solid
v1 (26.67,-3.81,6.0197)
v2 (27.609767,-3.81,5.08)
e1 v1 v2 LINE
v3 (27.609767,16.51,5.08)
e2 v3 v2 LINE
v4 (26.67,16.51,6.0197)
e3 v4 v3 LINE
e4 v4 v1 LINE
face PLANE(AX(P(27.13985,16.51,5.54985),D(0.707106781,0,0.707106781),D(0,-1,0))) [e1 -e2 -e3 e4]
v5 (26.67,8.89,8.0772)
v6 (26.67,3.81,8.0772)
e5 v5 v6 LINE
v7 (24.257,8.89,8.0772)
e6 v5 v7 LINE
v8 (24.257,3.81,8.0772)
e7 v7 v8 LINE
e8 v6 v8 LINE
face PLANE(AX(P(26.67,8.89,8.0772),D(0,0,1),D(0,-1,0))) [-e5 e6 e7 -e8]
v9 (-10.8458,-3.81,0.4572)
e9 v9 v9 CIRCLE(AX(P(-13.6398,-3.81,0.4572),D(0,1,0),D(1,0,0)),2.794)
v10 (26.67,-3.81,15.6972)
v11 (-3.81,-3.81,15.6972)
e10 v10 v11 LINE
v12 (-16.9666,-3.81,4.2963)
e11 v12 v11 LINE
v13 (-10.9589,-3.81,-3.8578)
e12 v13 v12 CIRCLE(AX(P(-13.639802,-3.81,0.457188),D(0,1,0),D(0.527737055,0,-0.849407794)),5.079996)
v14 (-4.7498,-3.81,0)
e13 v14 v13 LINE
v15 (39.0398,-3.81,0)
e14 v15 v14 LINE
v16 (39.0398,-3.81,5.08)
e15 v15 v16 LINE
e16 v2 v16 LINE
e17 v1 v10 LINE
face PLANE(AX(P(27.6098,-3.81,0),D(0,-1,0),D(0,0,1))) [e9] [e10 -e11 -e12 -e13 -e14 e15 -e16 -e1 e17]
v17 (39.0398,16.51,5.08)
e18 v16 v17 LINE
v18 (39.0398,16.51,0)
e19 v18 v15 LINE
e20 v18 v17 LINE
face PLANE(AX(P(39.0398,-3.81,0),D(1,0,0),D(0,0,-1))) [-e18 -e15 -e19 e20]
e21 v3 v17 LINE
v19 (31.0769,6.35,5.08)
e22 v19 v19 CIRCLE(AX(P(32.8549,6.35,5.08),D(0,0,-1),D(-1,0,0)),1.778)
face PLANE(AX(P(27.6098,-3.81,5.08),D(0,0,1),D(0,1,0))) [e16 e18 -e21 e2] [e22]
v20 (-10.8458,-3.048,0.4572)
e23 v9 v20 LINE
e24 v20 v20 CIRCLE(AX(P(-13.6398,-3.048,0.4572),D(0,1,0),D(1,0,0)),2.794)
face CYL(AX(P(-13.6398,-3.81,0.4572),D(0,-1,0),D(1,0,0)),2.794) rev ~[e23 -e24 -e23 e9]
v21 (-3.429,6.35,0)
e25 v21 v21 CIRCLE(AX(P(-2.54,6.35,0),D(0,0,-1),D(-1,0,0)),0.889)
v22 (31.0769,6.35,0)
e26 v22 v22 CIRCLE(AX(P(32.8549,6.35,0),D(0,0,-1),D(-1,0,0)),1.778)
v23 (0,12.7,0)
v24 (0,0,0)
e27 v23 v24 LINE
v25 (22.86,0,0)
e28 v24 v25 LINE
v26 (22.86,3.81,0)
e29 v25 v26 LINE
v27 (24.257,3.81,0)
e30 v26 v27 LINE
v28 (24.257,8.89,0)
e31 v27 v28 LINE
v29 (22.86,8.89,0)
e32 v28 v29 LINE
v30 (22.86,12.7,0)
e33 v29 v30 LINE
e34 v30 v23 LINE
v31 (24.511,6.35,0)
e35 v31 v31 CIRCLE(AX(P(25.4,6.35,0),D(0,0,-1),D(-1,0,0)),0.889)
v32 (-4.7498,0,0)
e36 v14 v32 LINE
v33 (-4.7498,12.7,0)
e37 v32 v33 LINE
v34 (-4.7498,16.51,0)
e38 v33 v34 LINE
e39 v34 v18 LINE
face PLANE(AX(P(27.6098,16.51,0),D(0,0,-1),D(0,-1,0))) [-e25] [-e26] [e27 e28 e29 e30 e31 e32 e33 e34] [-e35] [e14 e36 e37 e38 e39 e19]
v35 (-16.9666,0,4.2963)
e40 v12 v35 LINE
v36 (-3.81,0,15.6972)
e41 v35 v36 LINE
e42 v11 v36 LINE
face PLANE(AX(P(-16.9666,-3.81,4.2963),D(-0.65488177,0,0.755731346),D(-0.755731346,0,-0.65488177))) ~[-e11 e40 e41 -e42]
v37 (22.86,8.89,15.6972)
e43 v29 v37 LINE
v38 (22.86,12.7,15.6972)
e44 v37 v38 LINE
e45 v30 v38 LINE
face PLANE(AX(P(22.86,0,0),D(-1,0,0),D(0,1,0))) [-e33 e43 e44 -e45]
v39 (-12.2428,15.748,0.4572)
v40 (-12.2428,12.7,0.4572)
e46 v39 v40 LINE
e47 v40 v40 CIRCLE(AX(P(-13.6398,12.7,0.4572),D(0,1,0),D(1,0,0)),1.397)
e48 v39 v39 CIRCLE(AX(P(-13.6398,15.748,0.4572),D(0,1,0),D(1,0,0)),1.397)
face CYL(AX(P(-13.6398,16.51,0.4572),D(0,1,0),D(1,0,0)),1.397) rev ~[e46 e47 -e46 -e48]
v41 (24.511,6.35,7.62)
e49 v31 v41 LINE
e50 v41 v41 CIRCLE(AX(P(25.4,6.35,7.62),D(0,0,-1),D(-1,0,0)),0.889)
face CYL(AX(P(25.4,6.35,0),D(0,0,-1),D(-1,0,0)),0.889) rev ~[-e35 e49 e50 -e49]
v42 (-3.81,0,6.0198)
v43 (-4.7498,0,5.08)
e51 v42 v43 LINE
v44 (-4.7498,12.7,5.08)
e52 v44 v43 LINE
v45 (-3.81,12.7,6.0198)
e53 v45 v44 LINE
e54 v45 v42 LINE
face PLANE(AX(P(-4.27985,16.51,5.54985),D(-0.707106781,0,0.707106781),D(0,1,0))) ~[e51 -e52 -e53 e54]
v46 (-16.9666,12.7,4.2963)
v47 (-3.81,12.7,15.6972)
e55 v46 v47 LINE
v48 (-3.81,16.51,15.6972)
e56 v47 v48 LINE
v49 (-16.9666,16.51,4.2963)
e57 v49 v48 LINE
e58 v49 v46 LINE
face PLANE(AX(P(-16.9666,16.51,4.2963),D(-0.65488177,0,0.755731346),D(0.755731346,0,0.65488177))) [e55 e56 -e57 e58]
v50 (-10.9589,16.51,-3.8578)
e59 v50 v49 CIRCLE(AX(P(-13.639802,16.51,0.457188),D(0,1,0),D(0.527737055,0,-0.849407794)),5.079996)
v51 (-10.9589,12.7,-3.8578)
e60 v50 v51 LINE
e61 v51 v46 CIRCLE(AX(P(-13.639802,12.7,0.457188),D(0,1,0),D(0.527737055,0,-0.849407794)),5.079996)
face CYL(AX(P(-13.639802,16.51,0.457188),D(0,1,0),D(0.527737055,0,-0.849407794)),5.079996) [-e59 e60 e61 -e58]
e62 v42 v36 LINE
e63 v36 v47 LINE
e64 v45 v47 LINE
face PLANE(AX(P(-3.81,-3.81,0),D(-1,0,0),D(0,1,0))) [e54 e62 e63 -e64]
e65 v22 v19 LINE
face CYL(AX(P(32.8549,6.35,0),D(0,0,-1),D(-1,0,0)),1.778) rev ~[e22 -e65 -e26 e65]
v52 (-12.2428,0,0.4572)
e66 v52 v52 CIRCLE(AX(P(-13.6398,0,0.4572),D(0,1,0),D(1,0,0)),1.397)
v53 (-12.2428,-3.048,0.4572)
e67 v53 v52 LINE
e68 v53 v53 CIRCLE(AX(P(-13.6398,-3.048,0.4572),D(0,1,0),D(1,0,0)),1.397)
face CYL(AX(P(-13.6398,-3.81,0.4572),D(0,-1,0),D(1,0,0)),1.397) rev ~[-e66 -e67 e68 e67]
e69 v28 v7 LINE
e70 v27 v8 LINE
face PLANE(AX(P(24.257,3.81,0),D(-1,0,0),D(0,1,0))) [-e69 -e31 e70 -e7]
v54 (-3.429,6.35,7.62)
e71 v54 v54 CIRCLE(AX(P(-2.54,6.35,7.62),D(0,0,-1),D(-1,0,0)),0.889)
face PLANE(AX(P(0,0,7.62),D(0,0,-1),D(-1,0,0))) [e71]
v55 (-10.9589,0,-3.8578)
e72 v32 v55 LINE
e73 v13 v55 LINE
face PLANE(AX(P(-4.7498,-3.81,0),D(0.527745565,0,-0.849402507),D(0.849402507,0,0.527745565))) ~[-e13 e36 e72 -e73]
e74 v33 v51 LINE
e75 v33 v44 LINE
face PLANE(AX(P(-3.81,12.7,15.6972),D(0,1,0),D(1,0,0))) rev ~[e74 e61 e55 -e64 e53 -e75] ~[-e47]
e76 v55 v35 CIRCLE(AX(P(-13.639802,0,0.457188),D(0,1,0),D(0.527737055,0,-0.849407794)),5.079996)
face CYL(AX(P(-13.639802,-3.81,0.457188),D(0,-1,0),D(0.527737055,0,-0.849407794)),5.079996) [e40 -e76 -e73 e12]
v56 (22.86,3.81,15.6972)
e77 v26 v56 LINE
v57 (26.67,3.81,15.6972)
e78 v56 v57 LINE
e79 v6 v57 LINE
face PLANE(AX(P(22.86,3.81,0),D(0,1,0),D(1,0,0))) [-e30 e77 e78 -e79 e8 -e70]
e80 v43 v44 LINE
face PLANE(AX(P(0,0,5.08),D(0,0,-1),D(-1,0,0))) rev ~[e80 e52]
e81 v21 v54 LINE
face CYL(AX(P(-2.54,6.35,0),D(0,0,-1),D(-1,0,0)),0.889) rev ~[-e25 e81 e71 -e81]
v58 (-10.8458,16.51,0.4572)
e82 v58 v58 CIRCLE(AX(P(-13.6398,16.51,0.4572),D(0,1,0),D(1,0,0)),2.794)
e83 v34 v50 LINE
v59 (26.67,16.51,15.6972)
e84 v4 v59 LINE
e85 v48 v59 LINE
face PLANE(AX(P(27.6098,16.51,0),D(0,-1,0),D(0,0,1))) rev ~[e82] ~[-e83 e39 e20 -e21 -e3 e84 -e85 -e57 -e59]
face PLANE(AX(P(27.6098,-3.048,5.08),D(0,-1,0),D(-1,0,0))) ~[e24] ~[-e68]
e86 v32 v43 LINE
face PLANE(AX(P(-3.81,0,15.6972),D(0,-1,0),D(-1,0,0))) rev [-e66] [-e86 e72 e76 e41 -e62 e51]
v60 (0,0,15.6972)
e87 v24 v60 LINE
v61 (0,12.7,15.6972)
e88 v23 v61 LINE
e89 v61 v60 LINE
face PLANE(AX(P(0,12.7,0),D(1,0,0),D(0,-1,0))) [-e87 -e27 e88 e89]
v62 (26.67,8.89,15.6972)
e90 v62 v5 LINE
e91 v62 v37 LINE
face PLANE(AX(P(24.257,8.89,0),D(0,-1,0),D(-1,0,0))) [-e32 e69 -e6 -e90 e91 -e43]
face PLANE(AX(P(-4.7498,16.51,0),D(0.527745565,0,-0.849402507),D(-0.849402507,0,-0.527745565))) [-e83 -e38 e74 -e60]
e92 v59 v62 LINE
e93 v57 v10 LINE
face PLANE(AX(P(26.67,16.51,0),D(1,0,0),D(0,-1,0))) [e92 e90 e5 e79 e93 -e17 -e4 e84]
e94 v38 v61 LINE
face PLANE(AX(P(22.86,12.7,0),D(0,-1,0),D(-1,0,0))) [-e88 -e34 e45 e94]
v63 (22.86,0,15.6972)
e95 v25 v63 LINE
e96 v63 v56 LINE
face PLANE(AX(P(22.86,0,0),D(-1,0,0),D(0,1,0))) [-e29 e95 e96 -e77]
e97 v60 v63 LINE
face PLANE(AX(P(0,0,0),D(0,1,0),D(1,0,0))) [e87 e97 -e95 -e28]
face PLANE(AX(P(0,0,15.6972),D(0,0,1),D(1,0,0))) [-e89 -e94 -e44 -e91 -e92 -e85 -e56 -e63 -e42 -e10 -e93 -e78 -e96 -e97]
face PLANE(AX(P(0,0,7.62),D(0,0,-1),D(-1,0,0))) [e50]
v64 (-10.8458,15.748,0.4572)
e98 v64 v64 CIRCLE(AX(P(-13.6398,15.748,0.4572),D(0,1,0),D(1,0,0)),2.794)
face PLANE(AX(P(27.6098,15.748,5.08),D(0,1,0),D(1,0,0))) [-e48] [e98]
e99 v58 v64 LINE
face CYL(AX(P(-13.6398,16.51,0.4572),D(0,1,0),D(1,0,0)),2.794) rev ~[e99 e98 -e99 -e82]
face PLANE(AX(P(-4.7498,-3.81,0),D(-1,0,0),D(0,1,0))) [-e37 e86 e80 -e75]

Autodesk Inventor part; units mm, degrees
ref_plane "YZ Plane" through (0, 0, 0) normal (1, 0, 0) x (0, 1, 0)
sketch "Sketch1" plane through (0, 0, 0) normal (0, 0, 1) x (1, 0, 0)
  line L0 (0, 0) -> (22.86, 0)
  line L1 (22.86, 0) -> (22.86, 12.7)
  line L2 (22.86, 12.7) -> (0, 12.7)
  line L3 (0, 12.7) -> (0, 0)
  line L4 (-3.81, 16.51) -> (26.67, 16.51)
  line L5 (26.67, 16.51) -> (26.67, -3.81)
  line L6 (26.67, -3.81) -> (-3.81, -3.81)
  line L7 (-3.81, -3.81) -> (-3.81, 16.51)
  dimension "d0" = 22.86
  dimension "d1" = 12.7
  dimension "d2" = 20.32
extrude "Extrusion1" add sketch "Sketch1" along normal blind 15.6972
sketch "Sketch2" plane through (26.67, -3.81, 0) normal (1, 0, 0) x (0, 0, -1)
  line L0 (-15.6972, 16.51) -> (-15.6972, 3.81) projected
  line L1 (-15.6972, 12.7) -> (-8.0772, 12.7)
  line L2 (-8.0772, 12.7) -> (-8.0772, 7.62)
  line L3 (-8.0772, 7.62) -> (-15.6972, 7.62)
  line L4 (-15.6972, 7.62) -> (-15.6972, 12.7)
  line L5 (0, 0) -> (0, 20.32) projected
  point P0 (0, 3.81)
  point P1 (-8.0772, 10.16)
  point P2 (0, 10.16)
  dimension "d5" = 5.08
  dimension "d6" = 7.62
extrude "Extrusion2" cut sketch "Sketch2" against normal up to surface (3.81 mm away)
sketch "Sketch3" plane through (0, 0, 0) normal (0, 0, -1) x (-1, 0, 0)
  line L0 (3.81, -3.81) -> (-26.67, -3.81) projected
  line L1 (3.81, -3.81) -> (4.7498, -3.81)
  line L2 (4.7498, -3.81) -> (4.7498, 16.51)
  line L3 (4.7498, 16.51) -> (3.81, 16.51)
  line L4 (3.81, 16.51) -> (3.81, -3.81)
  line L5 (0, 0) -> (0, 12.7) projected
  line L6 (-26.67, -3.81) -> (-27.6098, -3.81)
  line L7 (-27.6098, -3.81) -> (-27.6098, 16.51)
  line L8 (-27.6098, 16.51) -> (-26.67, 16.51)
  line L9 (-26.67, 16.51) -> (-26.67, -3.81)
  line L10 (-22.86, 12.7) -> (-22.86, 0) projected
  dimension "d9" = 4.7498
  dimension "d18" = 4.7498
extrude "Extrusion3" add sketch "Sketch3" against normal blind 5.08
chamfer "Chamfer1" distance 0.9398 angle 45 2 edges at (-3.81, 6.35, 5.08) (26.67, 6.35, 5.08)
sketch "Sketch4" plane through (0, 0, 0) normal (0, 0, -1) x (-1, 0, 0)
  circle A0 centre (2.54, 6.35) radius 0.889
  line L0 (4.7498, -3.81) -> (3.81, -3.81) construction
  line L1 (0, 0) -> (4.7498, 0) construction
  line L2 (4.7498, 0) -> (4.7498, -3.81) construction
  line L3 (4.7498, -3.81) -> (0, -3.81) construction
  line L4 (0, -3.81) -> (0, 0) construction
  line L5 (4.7498, -3.81) -> (4.7498, 16.51) projected
  line L6 (-22.86, 0) -> (0, 0) projected
  line L7 (-11.43, 0) -> (-11.43, 12.7) construction
  line L8 (0, 12.7) -> (-22.86, 12.7) projected
  circle A1 centre (-25.4, 6.35) radius 0.889
  point P0 (2.3749, -3.81)
  point P1 (4.7498, 6.35)
  dimension "d15" = 1.778
  dimension "d27" = 13.97
extrude "Extrusion4" cut sketch "Sketch4" against normal blind 7.62
ref_plane "Work Plane1" through (11.43, -3.81, 15.6972) normal (-1, 0, 0) x (0, 0, 1)
sketch "Sketch5" plane through (-3.81, 16.51, 15.6972) normal (0, 1, 0) x (1, 0, 0)
  line L0 (0, 0) -> (30.48, 0) projected
  line L1 (-0.9398, 15.6972) -> (-0.9398, 10.6172) projected
  line L2 (0, 9.6774) -> (-0.9398, 10.6172) projected
  line L3 (0, 9.6774) -> (0, 0) projected
  line L4 (-0.9398, 15.6972) -> (31.4198, 15.6972) projected
  line L5 (-0.9398, 15.6972) -> (-7.1489, 19.555)
  line L6 (-13.1566, 11.4009) -> (0, 0)
  arc A0 (-7.1489, 19.555) -> (-13.1566, 11.4009) centre (-9.8298, 15.24) ccw
  circle A1 centre (-9.8298, 15.24) radius 1.397
  line L7 (-0.9398, 10.6172) -> (0, 9.6774) projected
  point P0 (3.81, 15.6972)
  dimension "d24" = 5.08
  dimension "d25" = 8.89
  dimension "d26" = 2.794
  dimension "d42" = 15.24
extrude "Extrusion5" add sketch "Sketch5" against normal blind 3.81
ref_plane "Work Plane2" through (26.67, 6.35, 15.6972) normal (0, 1, 0) x (1, 0, 0)
mirror "Mirror1" about plane through (26.67, 6.35, 15.6972) normal (0, 1, 0) of "Extrusion5"
sketch "Sketch6" plane through (27.6098, 16.51, 5.08) normal (0, 1, 0) x (1, 0, 0)
  circle A0 centre (-41.2496, 4.6228) radius 1.397 projected
  circle A1 centre (-41.2496, 4.6228) radius 2.794
  point P0 (-27.6098, 5.08)
  dimension "d29" = 5.588
extrude "Extrusion6" cut sketch "Sketch6" against normal blind 0.762
mirror "Mirror2" about plane through (26.67, 6.35, 15.6972) normal (0, 1, 0) of "Extrusion6"
sketch "Sketch7" plane through (27.6098, -3.81, 0) normal (1, 0, 0) x (0, 0, -1)
  line L0 (0, 20.32) -> (0, 0) projected
  line L1 (0, 20.32) -> (-5.08, 20.32) projected
  line L2 (-5.08, 0) -> (-5.08, 20.32) projected
  line L3 (0, 0) -> (-5.08, 0) projected
  point P0 (0, 3.81)
extrude "Extrusion7" add sketch "Sketch7" along normal blind 11.43
sketch "Sketch8" plane through (0, 0, 0) normal (0, 0, -1) x (-1, 0, 0)
  circle A0 centre (-32.8549, 6.35) radius 1.778
  line L0 (-39.0398, -3.81) -> (-39.0398, 16.51) projected
  line L1 (-26.67, 16.51) -> (-26.67, -3.81) projected
  line L2 (10.9589, 16.51) -> (-39.0398, 16.51) projected
  line L3 (-26.67, 16.51) -> (-39.0398, 16.51)
  point P0 (0, 0)
  point P1 (-39.0398, 6.35)
  point P2 (-32.8549, 16.51)
  dimension "d34" = 3.556
extrude "Extrusion8" cut sketch "Sketch8" against normal blind 18.7325
sketch "Sketch9" plane through (0, 0, 0) normal (0, 0, -1) x (-1, 0, 0)
  line L0 (-22.86, 12.7) -> (-22.86, 0) projected
  line L1 (-22.86, 3.81) -> (-24.257, 3.81)
  line L2 (-24.257, 3.81) -> (-24.257, 8.89)
  line L3 (-24.257, 8.89) -> (-22.86, 8.89)
  line L4 (-22.86, 8.89) -> (-22.86, 3.81)
  point P0 (0, 0)
  point P1 (-22.86, 6.35)
  dimension "d37" = 5.08
  dimension "d38" = 1.397
  dimension "d39" = 2.54
extrude "Extrusion9" cut sketch "Sketch9" against normal blind 22.225
equation "\"d18\" = d9"
equation "\"d39\" = 0.5 * d37"
properties part number "Servo Base"
